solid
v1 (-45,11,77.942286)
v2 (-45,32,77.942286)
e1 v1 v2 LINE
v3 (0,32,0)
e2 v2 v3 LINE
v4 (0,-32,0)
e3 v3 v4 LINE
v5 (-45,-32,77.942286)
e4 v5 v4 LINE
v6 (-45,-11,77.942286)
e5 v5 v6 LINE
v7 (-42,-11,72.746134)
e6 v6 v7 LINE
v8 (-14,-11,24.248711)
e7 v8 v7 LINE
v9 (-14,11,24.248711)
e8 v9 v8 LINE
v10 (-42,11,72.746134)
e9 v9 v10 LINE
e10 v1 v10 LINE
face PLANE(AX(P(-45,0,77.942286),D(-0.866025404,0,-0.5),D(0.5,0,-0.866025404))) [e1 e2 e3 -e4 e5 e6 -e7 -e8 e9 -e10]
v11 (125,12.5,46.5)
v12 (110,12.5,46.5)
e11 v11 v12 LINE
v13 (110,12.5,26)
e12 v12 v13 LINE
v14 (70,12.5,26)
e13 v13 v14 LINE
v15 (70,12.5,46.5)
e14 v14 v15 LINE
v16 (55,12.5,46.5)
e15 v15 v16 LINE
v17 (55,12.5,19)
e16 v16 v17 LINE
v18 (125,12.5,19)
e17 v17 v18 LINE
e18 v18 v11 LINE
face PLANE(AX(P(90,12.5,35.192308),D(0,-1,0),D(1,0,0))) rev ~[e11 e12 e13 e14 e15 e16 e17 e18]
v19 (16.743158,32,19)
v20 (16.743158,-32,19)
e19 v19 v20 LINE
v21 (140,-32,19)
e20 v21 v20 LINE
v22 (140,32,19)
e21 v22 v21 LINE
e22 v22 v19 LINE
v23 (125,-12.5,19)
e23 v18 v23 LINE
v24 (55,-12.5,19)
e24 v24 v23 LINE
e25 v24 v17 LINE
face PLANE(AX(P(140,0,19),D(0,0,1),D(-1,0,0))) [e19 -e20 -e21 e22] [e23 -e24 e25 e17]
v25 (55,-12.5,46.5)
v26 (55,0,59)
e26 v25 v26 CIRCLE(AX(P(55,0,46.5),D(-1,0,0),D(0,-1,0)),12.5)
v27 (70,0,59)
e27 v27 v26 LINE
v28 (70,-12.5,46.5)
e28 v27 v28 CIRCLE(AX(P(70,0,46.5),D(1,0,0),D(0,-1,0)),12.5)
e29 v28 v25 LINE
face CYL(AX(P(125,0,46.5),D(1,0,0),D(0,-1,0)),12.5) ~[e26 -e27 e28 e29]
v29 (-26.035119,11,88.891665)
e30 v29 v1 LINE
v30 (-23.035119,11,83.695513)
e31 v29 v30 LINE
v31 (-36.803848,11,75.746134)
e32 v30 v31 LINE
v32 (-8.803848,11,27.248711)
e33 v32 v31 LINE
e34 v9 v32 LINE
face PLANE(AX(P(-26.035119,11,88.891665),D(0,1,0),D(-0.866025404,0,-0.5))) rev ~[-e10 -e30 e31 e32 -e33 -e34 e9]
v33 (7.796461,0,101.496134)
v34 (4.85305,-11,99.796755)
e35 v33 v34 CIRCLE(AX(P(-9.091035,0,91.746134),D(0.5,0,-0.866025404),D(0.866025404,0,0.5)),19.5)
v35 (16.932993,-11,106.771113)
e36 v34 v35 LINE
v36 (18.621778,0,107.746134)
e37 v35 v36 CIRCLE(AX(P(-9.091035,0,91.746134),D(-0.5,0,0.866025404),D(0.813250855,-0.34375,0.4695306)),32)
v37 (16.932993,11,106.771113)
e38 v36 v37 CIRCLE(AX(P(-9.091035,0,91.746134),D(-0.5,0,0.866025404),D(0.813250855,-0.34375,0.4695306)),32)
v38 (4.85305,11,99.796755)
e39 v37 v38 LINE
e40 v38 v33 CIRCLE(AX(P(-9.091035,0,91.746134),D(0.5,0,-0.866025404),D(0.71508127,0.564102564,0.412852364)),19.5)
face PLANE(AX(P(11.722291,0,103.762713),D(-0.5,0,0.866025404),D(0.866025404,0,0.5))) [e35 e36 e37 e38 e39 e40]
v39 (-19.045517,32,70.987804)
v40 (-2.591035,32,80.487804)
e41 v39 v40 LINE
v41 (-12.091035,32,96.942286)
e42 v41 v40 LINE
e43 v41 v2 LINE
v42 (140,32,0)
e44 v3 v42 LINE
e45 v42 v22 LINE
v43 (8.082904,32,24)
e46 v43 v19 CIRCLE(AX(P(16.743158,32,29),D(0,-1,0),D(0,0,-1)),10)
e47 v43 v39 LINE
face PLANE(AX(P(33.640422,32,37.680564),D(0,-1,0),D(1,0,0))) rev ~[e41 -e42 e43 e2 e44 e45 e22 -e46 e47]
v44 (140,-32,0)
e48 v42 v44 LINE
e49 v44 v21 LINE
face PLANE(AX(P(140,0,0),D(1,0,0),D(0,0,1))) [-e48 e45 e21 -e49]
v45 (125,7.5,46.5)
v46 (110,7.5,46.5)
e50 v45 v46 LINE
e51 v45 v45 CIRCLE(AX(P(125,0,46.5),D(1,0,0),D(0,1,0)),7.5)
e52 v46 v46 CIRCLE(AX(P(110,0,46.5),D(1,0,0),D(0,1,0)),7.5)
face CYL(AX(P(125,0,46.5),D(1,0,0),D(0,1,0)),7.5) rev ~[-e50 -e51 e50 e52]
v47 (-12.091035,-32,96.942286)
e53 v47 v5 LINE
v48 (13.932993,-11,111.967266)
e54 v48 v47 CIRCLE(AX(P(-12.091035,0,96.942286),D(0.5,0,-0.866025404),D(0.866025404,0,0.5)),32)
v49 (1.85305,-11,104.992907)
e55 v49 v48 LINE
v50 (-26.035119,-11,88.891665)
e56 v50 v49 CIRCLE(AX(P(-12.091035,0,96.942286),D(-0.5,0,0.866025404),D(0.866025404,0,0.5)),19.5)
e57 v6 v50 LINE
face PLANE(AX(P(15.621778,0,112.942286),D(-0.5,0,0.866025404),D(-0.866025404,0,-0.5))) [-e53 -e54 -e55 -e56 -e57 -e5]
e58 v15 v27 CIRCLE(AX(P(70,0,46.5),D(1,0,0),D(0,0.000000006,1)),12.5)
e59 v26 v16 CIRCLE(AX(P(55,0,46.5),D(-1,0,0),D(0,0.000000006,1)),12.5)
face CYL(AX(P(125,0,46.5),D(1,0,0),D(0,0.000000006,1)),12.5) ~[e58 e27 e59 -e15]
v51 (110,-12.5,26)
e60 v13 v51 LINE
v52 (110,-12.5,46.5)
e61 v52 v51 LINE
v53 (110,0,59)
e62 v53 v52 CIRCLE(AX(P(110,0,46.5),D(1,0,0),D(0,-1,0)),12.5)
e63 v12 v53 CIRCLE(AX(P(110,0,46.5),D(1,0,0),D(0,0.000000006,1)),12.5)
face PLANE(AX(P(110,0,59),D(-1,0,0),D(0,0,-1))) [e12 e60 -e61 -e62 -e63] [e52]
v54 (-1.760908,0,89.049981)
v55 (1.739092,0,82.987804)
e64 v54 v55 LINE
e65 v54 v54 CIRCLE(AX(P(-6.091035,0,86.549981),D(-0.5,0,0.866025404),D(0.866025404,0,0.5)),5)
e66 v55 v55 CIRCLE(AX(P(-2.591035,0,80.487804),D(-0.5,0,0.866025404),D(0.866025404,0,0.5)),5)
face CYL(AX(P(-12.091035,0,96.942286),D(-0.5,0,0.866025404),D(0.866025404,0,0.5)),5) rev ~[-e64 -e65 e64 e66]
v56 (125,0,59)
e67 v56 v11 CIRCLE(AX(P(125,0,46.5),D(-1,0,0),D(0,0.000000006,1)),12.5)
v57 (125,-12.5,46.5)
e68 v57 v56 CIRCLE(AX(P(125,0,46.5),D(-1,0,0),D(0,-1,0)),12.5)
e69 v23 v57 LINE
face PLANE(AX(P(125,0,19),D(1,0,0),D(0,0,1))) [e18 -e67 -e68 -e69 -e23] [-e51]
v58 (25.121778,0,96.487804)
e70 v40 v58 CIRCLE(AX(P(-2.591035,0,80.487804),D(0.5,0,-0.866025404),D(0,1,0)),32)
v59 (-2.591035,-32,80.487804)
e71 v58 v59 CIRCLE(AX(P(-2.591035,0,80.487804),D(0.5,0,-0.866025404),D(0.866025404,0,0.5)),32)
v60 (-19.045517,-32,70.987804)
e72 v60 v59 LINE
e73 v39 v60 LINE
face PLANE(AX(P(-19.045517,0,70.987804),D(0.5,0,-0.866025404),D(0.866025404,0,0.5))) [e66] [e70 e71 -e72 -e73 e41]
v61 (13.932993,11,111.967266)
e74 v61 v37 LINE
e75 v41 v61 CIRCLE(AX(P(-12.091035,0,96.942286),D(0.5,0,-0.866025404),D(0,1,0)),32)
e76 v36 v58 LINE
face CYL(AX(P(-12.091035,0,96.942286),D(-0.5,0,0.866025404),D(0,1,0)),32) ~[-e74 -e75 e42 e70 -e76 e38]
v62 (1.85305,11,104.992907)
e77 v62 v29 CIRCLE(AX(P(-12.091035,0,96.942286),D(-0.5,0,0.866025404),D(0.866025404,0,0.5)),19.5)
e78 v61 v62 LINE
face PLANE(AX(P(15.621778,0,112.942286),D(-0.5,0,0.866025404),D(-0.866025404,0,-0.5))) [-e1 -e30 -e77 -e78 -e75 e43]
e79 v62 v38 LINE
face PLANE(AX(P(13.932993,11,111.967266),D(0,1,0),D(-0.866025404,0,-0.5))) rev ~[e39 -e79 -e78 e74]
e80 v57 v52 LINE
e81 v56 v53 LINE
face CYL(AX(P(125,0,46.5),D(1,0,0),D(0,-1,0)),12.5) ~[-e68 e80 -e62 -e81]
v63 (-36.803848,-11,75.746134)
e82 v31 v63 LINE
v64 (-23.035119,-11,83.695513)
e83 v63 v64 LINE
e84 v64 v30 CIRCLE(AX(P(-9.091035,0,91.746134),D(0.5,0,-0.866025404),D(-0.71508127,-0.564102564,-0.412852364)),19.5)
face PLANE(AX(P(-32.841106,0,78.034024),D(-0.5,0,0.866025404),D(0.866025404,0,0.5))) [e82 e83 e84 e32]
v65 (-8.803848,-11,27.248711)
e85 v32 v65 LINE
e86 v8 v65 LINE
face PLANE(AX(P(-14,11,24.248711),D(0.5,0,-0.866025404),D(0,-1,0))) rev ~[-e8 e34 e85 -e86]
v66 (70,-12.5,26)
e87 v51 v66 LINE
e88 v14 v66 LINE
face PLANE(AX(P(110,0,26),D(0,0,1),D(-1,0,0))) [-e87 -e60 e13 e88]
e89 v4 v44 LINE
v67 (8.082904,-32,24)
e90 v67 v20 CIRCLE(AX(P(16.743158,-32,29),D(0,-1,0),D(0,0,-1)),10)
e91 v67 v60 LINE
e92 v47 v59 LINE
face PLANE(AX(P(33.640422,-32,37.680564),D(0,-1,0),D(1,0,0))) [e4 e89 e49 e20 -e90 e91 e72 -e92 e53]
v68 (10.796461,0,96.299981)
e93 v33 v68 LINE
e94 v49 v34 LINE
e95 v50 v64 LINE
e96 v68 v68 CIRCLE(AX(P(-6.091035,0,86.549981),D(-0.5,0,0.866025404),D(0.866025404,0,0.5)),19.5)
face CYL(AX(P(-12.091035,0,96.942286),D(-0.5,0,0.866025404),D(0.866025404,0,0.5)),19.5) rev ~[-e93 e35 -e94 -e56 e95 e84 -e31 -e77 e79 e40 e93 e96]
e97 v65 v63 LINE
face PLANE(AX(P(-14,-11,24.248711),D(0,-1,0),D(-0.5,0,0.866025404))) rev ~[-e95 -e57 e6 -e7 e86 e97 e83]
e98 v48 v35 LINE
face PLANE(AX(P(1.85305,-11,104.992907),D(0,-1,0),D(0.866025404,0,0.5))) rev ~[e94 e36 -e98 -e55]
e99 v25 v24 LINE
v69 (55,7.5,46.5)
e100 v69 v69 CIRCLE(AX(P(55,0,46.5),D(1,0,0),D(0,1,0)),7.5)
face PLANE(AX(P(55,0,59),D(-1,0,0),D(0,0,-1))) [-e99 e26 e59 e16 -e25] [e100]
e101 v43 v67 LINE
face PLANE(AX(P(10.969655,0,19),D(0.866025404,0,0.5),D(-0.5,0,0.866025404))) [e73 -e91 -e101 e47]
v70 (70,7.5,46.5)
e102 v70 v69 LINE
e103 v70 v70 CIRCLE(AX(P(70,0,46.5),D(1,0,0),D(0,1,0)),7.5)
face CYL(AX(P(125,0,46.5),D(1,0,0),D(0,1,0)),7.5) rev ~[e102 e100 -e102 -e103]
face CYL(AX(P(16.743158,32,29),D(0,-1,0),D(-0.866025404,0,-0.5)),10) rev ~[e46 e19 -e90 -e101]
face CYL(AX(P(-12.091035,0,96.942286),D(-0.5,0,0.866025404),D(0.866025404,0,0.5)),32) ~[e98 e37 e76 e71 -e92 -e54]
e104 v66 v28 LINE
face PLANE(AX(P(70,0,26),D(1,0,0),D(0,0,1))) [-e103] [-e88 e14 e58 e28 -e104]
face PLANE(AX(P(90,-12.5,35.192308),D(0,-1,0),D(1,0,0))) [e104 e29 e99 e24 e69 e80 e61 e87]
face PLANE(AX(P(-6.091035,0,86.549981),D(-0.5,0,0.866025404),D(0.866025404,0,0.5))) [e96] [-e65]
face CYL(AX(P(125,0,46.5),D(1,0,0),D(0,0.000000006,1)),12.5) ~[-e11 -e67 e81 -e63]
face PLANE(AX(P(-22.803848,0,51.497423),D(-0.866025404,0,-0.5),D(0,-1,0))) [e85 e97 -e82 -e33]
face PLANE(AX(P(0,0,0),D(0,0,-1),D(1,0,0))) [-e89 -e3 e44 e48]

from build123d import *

# Parameters (mm, degrees)
F1_DEPTH  = 32
F2_DEPTH  = 12.5
F4_DEPTH  = 19
F5_R      = 10
F6_R      = 5
F7_DEPTH  = 19
F6_R_2    = 19.5
F8_DEPTH  = 12
F10_DEPTH = 6
F11_W     = 22
F11_H     = 56
F12_DEPTH = 6
F14_DEPTH = 70
F15_R     = 7.5
F16_DEPTH = 70


with BuildPart() as f1:
    # F0 (on Front) → F1 (new body, symmetric)
    with BuildSketch(Plane.XZ):
        Polygon((-45, 77.9422863406), (0, 0), (140, 0), (140, 19), (125, 19), (55, 19), (10.9696551146, 19), (-19.0455173281, 70.9878036687), (25.1217782649, 96.4878036687), (15.6217782649, 112.9422863406), align=None)
    extrude(amount=F1_DEPTH, both=True)

    # F0 (on Front) → F2 (join, symmetric)
    with BuildSketch(Plane.XZ):
        Polygon((55, 19), (125, 19), (125, 59), (110, 59), (110, 26), (70, 26), (70, 59), (55, 59), align=None)
    extrude(amount=F2_DEPTH, both=True)

    # F3 (on face) → F4 (cut, through all)
    with BuildSketch(Plane(origin=(-45, 0, 77.9422863406), x_dir=(0.8660254038, 0, 0.5), z_dir=(-0.5, 0, 0.8660254038))):
        with BuildLine():
            ThreePointArc((38, 32), (60.627416998, 22.627416998), (70, 0))
            Line((70, 0), (70, 32))
            Line((70, 32), (38, 32))
        make_face()
        with BuildLine():
            Line((70, -32), (70, 0))
            ThreePointArc((70, 0), (60.627416998, -22.627416998), (38, -32))
            Line((38, -32), (70, -32))
        make_face()
    extrude(amount=-F4_DEPTH, mode=Mode.SUBTRACT)

    # F5
    f5_edges = [f1.edges().sort_by_distance(p)[0] for p in [
        (10.969655, 0, 19),
    ]]
    fillet(f5_edges, radius=F5_R)

    # F6 (on face) → F7 (cut, through all)
    with BuildSketch(Plane(origin=(-45, 0, 77.9422863406), x_dir=(0.8660254038, 0, 0.5), z_dir=(-0.5, 0, 0.8660254038))):
        with Locations((38, 0)):
            Circle(F6_R)
    extrude(amount=-F7_DEPTH, mode=Mode.SUBTRACT)

    # F6 (on face) → F8 (cut)
    with BuildSketch(Plane(origin=(-45, 0, 77.9422863406), x_dir=(0.8660254038, 0, 0.5), z_dir=(-0.5, 0, 0.8660254038))):
        with Locations((38, 0)):
            Circle(F6_R_2)
        with Locations((38, 0)):
            Circle(F6_R, mode=Mode.SUBTRACT)
    extrude(amount=-F8_DEPTH, mode=Mode.SUBTRACT)

    # F9 (on face) → F10 (cut)
    with BuildSketch(Plane(origin=(-45, 0, 77.9422863406), x_dir=(0.8660254038, 0, 0.5), z_dir=(-0.5, 0, 0.8660254038))):
        with BuildLine():
            Line((21.8987578119, 11), (0, 11))
            Line((0, 11), (0, -11))
            Line((0, -11), (21.8987578119, -11))
            ThreePointArc((21.8987578119, -11), (18.5, 0), (21.8987578119, 11))
        make_face()
        with BuildLine():
            Line((68.0499584026, 11), (54.1012421881, 11))
            ThreePointArc((54.1012421881, 11), (56.630944993, 5.7565518035), (57.5, 0))
            ThreePointArc((57.5, 0), (56.630944993, -5.7565518035), (54.1012421881, -11))
            Line((54.1012421881, -11), (68.0499584026, -11))
            ThreePointArc((68.0499584026, -11), (70, 0), (68.0499584026, 11))
        make_face()
    extrude(amount=-F10_DEPTH, mode=Mode.SUBTRACT)

    # F11 (on face) → F12 (cut)
    with BuildSketch(Plane(origin=(0, 0, 0), x_dir=(0, -1, 0), z_dir=(-0.8660254038, 0, -0.5))):
        with Locations((0, 56)):
            Rectangle(F11_W, F11_H)
    extrude(amount=-F12_DEPTH, mode=Mode.SUBTRACT)

    # F13 (on face) → F14 (cut, through all)
    with BuildSketch(Plane.YZ.offset(125)):
        with BuildLine():
            ThreePointArc((-12.5, 46.5), (-8.8388347372, 55.3388347924), (7.81e-08, 59))
            Line((7.81e-08, 59), (-12.5, 59))
            Line((-12.5, 59), (-12.5, 46.5))
        make_face()
        with BuildLine():
            ThreePointArc((7.81e-08, 59), (8.8388347924, 55.3388347372), (12.5, 46.5))
            Line((12.5, 46.5), (12.5, 59))
            Line((12.5, 59), (7.81e-08, 59))
        make_face()
    extrude(amount=-F14_DEPTH, mode=Mode.SUBTRACT)

    # F15 (on face) → F16 (cut, through all)
    with BuildSketch(Plane.YZ.offset(125)):
        with Locations((0, 46.5)):
            Circle(F15_R)
    extrude(amount=-F16_DEPTH, mode=Mode.SUBTRACT)


solid = f1.part
